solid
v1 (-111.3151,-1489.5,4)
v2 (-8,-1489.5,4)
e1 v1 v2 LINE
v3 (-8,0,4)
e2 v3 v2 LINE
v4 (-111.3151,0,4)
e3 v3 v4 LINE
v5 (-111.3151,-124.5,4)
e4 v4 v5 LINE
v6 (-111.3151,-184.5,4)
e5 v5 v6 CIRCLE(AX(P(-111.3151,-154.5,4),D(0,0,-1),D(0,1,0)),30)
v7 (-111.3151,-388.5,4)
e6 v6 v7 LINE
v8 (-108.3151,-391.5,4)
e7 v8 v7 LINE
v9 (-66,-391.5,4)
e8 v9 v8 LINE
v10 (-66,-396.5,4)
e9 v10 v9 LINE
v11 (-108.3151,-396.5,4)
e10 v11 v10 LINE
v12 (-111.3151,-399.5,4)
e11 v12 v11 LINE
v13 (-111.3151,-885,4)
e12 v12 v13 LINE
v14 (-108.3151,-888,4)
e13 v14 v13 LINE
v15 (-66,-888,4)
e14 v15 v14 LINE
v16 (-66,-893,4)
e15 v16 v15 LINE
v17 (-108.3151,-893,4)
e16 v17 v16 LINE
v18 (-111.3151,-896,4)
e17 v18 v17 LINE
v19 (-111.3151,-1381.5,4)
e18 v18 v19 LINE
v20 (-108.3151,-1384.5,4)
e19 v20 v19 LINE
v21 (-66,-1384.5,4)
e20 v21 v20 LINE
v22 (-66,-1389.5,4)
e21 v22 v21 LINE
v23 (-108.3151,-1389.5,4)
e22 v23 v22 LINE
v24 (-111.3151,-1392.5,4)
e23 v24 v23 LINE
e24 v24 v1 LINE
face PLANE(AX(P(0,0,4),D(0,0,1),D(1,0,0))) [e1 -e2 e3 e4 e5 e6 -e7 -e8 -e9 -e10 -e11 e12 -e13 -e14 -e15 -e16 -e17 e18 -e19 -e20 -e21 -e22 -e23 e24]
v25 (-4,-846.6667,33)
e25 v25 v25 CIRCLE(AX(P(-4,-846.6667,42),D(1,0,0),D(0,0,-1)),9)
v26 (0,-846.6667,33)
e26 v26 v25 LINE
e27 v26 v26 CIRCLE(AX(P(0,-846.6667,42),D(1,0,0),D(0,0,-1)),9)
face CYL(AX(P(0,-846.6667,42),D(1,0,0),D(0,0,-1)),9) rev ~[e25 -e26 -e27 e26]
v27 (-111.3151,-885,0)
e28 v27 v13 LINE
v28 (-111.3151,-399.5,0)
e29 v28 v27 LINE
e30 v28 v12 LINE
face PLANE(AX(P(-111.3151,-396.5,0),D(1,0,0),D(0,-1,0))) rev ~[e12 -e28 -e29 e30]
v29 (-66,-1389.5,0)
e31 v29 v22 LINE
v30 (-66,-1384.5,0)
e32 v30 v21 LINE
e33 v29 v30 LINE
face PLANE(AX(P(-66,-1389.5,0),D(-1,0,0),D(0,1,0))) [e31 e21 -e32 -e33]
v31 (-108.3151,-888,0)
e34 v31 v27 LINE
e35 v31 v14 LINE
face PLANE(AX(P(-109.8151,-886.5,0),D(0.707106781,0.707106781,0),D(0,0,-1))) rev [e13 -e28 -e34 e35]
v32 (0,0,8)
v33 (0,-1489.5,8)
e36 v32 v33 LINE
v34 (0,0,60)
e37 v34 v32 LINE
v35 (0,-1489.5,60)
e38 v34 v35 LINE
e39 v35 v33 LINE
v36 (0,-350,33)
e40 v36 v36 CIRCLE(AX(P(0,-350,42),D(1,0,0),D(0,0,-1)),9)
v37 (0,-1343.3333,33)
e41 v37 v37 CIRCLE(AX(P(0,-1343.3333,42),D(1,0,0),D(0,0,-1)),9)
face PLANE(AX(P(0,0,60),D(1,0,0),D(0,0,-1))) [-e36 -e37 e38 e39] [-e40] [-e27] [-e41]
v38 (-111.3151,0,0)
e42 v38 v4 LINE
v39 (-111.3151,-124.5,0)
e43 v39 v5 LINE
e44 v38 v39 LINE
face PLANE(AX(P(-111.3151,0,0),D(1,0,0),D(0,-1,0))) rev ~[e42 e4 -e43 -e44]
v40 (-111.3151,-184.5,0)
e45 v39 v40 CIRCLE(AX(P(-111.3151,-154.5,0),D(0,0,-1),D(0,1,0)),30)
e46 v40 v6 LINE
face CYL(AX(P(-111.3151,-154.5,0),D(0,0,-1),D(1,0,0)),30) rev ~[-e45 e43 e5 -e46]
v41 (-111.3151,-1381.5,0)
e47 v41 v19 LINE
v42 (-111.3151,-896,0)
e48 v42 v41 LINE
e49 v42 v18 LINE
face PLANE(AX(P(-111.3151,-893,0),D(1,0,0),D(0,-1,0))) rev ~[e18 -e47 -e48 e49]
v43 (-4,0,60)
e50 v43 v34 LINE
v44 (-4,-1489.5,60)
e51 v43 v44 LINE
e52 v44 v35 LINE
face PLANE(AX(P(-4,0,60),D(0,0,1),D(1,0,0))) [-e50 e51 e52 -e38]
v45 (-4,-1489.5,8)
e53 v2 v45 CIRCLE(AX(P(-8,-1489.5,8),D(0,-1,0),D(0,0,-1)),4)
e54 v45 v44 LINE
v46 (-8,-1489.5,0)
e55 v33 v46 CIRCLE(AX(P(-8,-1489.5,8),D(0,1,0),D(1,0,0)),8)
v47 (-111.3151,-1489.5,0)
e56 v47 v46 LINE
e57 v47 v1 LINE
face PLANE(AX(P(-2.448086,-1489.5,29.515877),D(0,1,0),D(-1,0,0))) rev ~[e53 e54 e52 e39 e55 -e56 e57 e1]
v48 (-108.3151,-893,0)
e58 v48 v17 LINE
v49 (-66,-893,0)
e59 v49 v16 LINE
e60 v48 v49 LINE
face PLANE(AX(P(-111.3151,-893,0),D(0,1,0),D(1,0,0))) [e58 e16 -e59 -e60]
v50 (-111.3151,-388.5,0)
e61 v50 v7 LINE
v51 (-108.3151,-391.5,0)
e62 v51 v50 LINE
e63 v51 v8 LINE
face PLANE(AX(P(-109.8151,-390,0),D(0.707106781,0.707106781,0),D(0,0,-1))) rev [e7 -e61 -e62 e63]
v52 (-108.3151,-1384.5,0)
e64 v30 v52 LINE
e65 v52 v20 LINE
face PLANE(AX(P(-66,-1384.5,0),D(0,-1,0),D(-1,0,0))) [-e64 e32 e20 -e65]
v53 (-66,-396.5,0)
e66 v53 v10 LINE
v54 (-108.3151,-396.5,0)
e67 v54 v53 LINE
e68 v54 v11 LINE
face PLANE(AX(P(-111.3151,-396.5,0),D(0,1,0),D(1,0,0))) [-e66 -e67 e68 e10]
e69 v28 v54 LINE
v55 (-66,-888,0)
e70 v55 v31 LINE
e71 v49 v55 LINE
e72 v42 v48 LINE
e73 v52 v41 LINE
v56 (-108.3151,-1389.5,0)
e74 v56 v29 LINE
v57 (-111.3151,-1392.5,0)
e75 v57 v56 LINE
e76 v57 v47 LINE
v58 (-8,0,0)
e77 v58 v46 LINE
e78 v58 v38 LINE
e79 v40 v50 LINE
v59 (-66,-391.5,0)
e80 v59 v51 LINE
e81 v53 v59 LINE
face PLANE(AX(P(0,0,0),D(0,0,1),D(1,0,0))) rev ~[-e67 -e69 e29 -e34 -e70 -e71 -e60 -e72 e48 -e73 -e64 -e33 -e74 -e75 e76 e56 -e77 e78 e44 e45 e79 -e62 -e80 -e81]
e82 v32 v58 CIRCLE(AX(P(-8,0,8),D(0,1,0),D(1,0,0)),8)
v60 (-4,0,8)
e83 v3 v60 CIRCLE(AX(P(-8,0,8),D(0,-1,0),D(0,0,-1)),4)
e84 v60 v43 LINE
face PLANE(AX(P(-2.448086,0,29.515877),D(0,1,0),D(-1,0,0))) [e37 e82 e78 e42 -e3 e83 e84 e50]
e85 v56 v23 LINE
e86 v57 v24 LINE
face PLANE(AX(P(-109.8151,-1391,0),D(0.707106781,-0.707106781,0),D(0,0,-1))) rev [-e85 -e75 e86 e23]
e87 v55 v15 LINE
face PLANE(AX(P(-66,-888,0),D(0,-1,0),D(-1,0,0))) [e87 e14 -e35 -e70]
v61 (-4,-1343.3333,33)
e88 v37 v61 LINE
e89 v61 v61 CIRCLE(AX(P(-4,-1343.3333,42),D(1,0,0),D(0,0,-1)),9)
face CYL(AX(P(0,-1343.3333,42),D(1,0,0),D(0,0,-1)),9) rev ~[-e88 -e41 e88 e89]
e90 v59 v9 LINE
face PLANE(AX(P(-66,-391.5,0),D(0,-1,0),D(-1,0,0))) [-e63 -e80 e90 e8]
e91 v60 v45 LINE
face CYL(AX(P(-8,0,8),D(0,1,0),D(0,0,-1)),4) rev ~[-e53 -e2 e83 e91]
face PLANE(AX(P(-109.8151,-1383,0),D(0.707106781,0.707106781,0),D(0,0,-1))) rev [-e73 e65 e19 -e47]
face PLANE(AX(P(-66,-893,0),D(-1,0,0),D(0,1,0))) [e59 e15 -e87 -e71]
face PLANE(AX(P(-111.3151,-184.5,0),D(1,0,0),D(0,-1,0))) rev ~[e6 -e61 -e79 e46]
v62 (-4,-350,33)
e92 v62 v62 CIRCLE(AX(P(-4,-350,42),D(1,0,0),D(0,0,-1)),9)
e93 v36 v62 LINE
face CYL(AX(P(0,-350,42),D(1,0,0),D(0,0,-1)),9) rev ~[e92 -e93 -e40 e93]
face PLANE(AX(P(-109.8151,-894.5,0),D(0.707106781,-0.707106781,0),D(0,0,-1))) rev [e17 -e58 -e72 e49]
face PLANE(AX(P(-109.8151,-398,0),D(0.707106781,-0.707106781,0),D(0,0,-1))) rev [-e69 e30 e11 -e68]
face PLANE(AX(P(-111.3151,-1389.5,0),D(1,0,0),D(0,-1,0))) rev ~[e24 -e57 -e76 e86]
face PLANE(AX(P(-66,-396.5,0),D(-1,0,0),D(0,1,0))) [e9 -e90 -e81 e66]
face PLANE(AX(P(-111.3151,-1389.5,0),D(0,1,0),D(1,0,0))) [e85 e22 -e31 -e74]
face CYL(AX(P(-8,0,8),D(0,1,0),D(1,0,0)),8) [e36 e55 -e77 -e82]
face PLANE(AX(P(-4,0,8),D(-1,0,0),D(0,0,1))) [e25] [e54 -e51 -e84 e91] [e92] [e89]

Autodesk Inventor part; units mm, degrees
ref_plane "YZ Plane" through (0, 0, 0) normal (1, 0, 0) x (0, 1, 0)
ref_plane "XZ Plane" through (0, 0, 0) normal (0, 1, 0) x (-1, 0, 0)
ref_plane "XY Plane" through (0, 0, 0) normal (0, 0, 1) x (1, 0, 0)
sketch "Sketch1" plane through (0, 0, 0) normal (0, 0, 1) x (1, 0, 0)
  line L0 (0, 0) -> (-111.3151, 0)
  line L1 (-111.3151, 0) -> (-111.3151, -1489.5)
  line L2 (-111.3151, -1489.5) -> (0, -1489.5)
  line L3 (0, -1489.5) -> (0, 0)
  line L4 (-111.3151, -1389.5) -> (-66, -1389.5)
  line L5 (-66, -1389.5) -> (-66, -1384.5)
  line L6 (-66, -1384.5) -> (-111.3151, -1384.5)
  line L7 (-111.3151, -1384.5) -> (-111.3151, -1389.5)
  line L8 (-111.3151, -893) -> (-66, -893)
  line L9 (-66, -893) -> (-66, -888)
  line L10 (-66, -888) -> (-111.3151, -888)
  line L11 (-111.3151, -888) -> (-111.3151, -893)
  line L12 (-111.3151, -396.5) -> (-66, -396.5)
  line L13 (-66, -396.5) -> (-66, -391.5)
  line L14 (-66, -391.5) -> (-111.3151, -391.5)
  line L15 (-111.3151, -391.5) -> (-111.3151, -396.5)
  circle A0 centre (-111.3151, -154.5) radius 30
  point P0 (-111.3151, -391.5)
  point P1 (-111.3151, -1384.5)
  point P2 (-111.3151, -124.5)
  point P3 (-111.3151, -184.5)
  dimension "d0" = 1489.5
  dimension "d1" = 111.3151
  dimension "d2" = 5
  dimension "d4" = 100
  dimension "d7" = 496.5
  dimension "d23" = 66
  dimension "d28" = 60
  dimension "d29" = 1335
extrude "Plate1" add sketch "Sketch1" along normal blind 4 contours L3 L2 L1 L4 L5 L6 L8 L9 L10 L12 L13 L14 A0 L0
sketch "Sketch2" plane through (-4, 0, 0) normal (1, 0, 0) x (0, 1, 0)
  line L0 (-1489.5, 0) -> (0, 0)
  line L1 (0, 0) -> (0, 60)
  line L2 (0, 60) -> (-1489.5, 60)
  line L3 (-1489.5, 60) -> (-1489.5, 0)
edge flange "Flange1" height 60 angle 90 thickness 4 bend radius 4 thickness toward (1, 0, 0) relief tear relief width 4 relief depth 2 edges at (0, -744.75, 4) wall of the first edge with corners at (-4, -1489.5, 0) (-4, 0, 0) (-4, 0, 60) (-4, -1489.5, 60)
bend "Bend1"
corner "Corner1"
chamfer "Corner Chamfer1" distance 3 angle 45 6 edges at (-111.3151, -1389.5, 2) (-111.3151, -1384.5, 2) (-111.3151, -893, 2) (-111.3151, -888, 2) (-111.3151, -391.5, 2) (-111.3151, -396.5, 2)
sketch "Sketch4" plane through (0, -1489.5, 60) normal (1, 0, 0) x (0, 0, -1)
  circle A0 centre (18, 1139.5) radius 9
  line L0 (0, 0) -> (0, 1489.5) projected
  circle A1 centre (18, 642.8333) radius 9
  circle A2 centre (18, 146.1667) radius 9
  point P0 (60, 1489.5)
  dimension "d30" = 18
  dimension "d31" = 18
  dimension "d32" = 350
  dimension "d35" = 496.6667
extrude "Cut1" cut sketch "Sketch4" against normal blind 4
equation "\"d0\" = Стрингер_длина"
equation "\"d1\" = стрингер_глубина_8"
equation "\"d2\" = паз_под_стрингер_толщина"
equation "\"d7\" = 0.333333 * Стрингер_длина"
equation "\"d23\" = паз_под_стрингер_глубина - Thickness"
equation "\"d28\" = 2 * радиус_выреза_под_сварку"
equation "\"d35\" = Шаг_шпангоутов"
equation "\"d40\" = Thickness"
equation "\"d12\" = Thickness"
equation "\"d13\" = BendReliefWidth"
equation "\"d14\" = BendReliefDepth"
equation "\"d15\" = MinimumRemnant"
equation "\"d16\" = TransitionRadius"
equation "\"d17\" = ребро_усилителей"
equation "\"d19\" = BendRadius"
equation "\"d20\" = CornerReliefSize"
equation "\"d21\" = GapSize"
equation "\"d22\" = JacobiRadiusSize"
equation "\"BendRadius\" = Thickness"
equation "\"BendReliefWidth\" = Thickness"
equation "\"BendReliefDepth\" = 0.5 * Thickness"
equation "\"CornerReliefSize\" = 4 * Thickness"
equation "\"MinimumRemnant\" = 2 * Thickness"
equation "\"TransitionRadius\" = BendRadius"
equation "\"JacobiRadiusSize\" = BendRadius"
equation "\"GapSize\" = Thickness"
equation "\"Стрингер_длина\" = 1489.5"
equation "\"стрингер_глубина_8\" = 111.315065"
equation "\"паз_под_стрингер_толщина\" = 5"
equation "\"паз_под_стрингер_глубина\" = 70"
equation "\"Thickness\" = 4"
equation "\"радиус_выреза_под_сварку\" = 30"
equation "\"Шаг_шпангоутов\" = 496.666667"
equation "\"ребро_усилителей\" = 60"
properties part number "GBK 0303 stringer 8" material "Steel"
